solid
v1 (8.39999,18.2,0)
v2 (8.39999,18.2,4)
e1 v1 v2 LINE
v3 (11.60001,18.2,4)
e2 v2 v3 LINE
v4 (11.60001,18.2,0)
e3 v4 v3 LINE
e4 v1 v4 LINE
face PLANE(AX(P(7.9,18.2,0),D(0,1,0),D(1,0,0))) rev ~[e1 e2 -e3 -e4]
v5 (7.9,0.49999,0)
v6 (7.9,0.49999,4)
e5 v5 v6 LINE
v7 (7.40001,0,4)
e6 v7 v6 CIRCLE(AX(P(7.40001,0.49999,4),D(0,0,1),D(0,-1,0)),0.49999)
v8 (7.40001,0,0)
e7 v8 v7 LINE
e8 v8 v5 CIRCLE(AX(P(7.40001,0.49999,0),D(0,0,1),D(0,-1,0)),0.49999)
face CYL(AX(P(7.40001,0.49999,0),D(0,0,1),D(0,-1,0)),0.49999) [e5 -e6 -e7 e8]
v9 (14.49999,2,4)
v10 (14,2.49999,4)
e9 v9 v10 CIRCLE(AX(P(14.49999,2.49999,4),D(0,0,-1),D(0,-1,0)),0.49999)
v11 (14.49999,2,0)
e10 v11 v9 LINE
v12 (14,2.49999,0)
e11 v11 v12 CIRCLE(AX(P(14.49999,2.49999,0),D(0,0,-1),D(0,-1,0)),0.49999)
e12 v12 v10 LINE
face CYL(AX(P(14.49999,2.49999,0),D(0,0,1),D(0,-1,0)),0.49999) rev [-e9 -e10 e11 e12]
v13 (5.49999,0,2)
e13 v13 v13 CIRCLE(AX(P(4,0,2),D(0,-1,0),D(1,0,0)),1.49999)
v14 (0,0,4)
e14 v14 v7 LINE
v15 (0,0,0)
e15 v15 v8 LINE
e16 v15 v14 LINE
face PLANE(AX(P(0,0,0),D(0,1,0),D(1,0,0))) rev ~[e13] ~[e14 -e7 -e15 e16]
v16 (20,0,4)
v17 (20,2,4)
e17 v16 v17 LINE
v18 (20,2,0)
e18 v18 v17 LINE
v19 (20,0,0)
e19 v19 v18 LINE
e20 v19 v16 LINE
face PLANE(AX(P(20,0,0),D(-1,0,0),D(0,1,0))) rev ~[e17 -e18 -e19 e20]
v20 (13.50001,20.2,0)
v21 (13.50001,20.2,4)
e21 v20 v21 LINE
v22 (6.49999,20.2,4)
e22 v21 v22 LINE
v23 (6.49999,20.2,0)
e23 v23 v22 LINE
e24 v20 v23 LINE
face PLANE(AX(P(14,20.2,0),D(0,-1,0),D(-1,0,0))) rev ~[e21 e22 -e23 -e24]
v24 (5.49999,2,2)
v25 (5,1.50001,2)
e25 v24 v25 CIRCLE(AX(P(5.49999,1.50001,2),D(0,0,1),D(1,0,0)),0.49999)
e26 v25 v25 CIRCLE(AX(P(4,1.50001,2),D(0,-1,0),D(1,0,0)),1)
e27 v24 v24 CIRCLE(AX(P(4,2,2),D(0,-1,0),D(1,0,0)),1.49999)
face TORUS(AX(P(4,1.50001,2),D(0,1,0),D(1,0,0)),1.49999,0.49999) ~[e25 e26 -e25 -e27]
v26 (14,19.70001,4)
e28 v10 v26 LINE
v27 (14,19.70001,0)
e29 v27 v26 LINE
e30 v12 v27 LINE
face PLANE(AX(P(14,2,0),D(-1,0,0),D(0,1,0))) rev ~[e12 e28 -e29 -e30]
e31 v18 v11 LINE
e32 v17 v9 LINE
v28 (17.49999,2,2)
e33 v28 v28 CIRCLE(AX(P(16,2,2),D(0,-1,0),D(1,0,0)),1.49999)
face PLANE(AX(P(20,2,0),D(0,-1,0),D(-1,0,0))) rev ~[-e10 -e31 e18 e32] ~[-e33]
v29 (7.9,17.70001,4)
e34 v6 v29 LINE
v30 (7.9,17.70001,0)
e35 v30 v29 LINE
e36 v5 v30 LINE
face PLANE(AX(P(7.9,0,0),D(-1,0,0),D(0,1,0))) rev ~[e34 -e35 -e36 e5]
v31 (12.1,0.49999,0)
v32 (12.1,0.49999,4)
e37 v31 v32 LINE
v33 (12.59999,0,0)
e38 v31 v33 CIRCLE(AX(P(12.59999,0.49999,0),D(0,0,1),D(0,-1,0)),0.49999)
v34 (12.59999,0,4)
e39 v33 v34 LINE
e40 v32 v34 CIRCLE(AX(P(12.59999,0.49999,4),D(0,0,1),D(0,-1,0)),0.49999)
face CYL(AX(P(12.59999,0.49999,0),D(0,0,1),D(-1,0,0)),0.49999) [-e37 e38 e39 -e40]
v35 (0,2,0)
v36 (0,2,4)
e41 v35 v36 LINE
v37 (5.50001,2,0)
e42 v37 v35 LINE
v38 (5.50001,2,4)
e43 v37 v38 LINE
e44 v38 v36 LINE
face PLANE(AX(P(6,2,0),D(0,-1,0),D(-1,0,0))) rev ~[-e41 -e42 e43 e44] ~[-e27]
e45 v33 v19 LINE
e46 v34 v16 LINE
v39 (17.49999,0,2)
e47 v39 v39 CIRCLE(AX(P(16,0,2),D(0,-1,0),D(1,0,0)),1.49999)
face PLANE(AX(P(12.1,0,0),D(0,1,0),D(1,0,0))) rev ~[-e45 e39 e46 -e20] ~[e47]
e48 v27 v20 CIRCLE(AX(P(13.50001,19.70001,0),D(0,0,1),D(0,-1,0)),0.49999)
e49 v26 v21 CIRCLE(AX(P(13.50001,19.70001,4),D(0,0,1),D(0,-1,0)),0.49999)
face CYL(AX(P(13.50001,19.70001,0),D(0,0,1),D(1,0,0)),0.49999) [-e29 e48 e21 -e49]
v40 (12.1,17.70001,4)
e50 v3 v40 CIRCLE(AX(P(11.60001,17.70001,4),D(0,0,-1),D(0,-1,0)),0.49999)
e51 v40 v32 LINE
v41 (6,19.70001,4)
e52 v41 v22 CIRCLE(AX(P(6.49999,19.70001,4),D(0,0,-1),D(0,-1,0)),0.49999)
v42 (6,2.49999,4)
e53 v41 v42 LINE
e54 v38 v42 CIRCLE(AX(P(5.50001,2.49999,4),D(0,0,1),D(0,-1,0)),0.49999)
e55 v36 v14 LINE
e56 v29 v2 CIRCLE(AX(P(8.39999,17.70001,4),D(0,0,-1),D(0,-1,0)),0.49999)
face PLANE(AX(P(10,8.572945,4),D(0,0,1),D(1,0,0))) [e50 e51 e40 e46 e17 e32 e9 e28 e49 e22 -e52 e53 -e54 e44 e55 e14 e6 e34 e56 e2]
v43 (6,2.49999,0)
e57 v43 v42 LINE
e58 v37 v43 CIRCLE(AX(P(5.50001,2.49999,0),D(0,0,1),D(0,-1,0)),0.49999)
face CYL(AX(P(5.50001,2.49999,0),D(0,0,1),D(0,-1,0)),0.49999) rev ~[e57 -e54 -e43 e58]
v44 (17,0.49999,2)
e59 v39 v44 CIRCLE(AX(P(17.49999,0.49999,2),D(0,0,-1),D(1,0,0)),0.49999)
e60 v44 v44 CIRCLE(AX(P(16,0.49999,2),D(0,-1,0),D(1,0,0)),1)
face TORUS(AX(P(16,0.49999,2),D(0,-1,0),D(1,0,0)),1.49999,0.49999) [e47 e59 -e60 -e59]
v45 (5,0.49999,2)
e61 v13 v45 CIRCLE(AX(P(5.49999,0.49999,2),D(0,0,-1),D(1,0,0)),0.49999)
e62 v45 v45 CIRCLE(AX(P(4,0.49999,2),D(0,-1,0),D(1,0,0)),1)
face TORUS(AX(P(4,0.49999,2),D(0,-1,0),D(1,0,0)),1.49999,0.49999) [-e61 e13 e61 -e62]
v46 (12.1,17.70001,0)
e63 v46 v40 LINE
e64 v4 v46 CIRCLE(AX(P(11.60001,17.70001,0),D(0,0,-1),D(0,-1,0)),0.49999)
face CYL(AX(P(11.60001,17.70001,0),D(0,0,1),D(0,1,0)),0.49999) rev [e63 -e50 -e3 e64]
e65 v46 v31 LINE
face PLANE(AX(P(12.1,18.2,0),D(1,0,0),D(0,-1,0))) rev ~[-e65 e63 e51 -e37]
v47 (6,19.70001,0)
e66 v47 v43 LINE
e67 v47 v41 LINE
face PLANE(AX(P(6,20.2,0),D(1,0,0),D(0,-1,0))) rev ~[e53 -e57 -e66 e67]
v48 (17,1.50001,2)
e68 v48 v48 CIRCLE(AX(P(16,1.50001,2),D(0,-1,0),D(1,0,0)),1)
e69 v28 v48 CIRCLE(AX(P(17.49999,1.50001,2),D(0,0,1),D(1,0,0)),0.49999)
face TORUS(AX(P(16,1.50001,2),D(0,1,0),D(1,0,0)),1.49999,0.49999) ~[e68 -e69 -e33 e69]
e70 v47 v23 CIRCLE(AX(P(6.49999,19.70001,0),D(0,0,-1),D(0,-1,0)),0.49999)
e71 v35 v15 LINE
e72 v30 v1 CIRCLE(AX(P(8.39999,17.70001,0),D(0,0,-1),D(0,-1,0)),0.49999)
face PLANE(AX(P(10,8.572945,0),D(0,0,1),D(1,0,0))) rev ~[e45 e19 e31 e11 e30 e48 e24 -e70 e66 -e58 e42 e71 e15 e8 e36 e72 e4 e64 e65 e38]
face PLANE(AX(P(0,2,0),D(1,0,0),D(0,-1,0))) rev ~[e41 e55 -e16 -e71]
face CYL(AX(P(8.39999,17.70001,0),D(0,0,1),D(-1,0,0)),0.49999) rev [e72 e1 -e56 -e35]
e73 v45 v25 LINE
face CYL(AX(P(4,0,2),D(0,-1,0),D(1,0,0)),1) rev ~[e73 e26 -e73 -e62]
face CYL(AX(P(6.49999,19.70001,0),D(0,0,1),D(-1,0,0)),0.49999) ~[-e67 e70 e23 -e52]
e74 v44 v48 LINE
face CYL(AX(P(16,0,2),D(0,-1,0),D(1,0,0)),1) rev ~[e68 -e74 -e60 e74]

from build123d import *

# Parameters (mm, degrees)
F2_DEPTH = 4
F1_R     = 1
F3_DEPTH = 22.2
F5_R     = 0.49999


# Not quite as in the source:
# - a fillet or chamfer is up to 0.001 mm smaller than in the source, because OpenCascade refuses the exact size


with BuildPart() as f2:
    # F0 (on Top) → F2 (new body)
    with BuildSketch(Plane.XY):
        Polygon((0, 2), (0, 0), (7.9, 0), (7.9, 18.2000004202), (12.1, 18.2000004202), (12.1, 0), (20, 0), (20, 2), (14, 2), (14, 20.2), (6, 20.2), (6, 2), align=None)
    extrude(amount=F2_DEPTH)


with BuildPart() as f3:
    # F1 (on Front) → F3 (new body)
    with BuildSketch(Plane.XZ):
        with Locations((4, 2)):
            Circle(F1_R)
    extrude(amount=-F3_DEPTH)


with BuildPart() as f3b:
    # F1 (on Front) → F3, piece 2 (new body)
    with BuildSketch(Plane.XZ):
        with Locations((16, 2)):
            Circle(F1_R)
    extrude(amount=-F3_DEPTH)


with BuildPart() as f2_1:
    add(f2.part)

    # F4: cut F3, F3b
    add(f3.part, mode=Mode.SUBTRACT)
    add(f3b.part, mode=Mode.SUBTRACT)

    # F5 (radius 0.5 in the source; OpenCascade refuses exactly that, so slightly less here)
    f5_edges = [f2_1.edges().sort_by_distance(p)[0] for p in [
        (7.9, 0, 2),
        (12.1, 0, 2),
        (14, 20.2, 2),
        (7.9, 18.2, 2),
        (12.1, 18.2, 2),
        (6, 20.2, 2),
        (6, 2, 2),
        (14, 2, 2),
        (3, 2, 2),
        (15, 2, 2),
        (3, 0, 2),
        (15, 0, 2),
    ]]
    fillet(f5_edges, radius=F5_R)


solid = f2_1.part
